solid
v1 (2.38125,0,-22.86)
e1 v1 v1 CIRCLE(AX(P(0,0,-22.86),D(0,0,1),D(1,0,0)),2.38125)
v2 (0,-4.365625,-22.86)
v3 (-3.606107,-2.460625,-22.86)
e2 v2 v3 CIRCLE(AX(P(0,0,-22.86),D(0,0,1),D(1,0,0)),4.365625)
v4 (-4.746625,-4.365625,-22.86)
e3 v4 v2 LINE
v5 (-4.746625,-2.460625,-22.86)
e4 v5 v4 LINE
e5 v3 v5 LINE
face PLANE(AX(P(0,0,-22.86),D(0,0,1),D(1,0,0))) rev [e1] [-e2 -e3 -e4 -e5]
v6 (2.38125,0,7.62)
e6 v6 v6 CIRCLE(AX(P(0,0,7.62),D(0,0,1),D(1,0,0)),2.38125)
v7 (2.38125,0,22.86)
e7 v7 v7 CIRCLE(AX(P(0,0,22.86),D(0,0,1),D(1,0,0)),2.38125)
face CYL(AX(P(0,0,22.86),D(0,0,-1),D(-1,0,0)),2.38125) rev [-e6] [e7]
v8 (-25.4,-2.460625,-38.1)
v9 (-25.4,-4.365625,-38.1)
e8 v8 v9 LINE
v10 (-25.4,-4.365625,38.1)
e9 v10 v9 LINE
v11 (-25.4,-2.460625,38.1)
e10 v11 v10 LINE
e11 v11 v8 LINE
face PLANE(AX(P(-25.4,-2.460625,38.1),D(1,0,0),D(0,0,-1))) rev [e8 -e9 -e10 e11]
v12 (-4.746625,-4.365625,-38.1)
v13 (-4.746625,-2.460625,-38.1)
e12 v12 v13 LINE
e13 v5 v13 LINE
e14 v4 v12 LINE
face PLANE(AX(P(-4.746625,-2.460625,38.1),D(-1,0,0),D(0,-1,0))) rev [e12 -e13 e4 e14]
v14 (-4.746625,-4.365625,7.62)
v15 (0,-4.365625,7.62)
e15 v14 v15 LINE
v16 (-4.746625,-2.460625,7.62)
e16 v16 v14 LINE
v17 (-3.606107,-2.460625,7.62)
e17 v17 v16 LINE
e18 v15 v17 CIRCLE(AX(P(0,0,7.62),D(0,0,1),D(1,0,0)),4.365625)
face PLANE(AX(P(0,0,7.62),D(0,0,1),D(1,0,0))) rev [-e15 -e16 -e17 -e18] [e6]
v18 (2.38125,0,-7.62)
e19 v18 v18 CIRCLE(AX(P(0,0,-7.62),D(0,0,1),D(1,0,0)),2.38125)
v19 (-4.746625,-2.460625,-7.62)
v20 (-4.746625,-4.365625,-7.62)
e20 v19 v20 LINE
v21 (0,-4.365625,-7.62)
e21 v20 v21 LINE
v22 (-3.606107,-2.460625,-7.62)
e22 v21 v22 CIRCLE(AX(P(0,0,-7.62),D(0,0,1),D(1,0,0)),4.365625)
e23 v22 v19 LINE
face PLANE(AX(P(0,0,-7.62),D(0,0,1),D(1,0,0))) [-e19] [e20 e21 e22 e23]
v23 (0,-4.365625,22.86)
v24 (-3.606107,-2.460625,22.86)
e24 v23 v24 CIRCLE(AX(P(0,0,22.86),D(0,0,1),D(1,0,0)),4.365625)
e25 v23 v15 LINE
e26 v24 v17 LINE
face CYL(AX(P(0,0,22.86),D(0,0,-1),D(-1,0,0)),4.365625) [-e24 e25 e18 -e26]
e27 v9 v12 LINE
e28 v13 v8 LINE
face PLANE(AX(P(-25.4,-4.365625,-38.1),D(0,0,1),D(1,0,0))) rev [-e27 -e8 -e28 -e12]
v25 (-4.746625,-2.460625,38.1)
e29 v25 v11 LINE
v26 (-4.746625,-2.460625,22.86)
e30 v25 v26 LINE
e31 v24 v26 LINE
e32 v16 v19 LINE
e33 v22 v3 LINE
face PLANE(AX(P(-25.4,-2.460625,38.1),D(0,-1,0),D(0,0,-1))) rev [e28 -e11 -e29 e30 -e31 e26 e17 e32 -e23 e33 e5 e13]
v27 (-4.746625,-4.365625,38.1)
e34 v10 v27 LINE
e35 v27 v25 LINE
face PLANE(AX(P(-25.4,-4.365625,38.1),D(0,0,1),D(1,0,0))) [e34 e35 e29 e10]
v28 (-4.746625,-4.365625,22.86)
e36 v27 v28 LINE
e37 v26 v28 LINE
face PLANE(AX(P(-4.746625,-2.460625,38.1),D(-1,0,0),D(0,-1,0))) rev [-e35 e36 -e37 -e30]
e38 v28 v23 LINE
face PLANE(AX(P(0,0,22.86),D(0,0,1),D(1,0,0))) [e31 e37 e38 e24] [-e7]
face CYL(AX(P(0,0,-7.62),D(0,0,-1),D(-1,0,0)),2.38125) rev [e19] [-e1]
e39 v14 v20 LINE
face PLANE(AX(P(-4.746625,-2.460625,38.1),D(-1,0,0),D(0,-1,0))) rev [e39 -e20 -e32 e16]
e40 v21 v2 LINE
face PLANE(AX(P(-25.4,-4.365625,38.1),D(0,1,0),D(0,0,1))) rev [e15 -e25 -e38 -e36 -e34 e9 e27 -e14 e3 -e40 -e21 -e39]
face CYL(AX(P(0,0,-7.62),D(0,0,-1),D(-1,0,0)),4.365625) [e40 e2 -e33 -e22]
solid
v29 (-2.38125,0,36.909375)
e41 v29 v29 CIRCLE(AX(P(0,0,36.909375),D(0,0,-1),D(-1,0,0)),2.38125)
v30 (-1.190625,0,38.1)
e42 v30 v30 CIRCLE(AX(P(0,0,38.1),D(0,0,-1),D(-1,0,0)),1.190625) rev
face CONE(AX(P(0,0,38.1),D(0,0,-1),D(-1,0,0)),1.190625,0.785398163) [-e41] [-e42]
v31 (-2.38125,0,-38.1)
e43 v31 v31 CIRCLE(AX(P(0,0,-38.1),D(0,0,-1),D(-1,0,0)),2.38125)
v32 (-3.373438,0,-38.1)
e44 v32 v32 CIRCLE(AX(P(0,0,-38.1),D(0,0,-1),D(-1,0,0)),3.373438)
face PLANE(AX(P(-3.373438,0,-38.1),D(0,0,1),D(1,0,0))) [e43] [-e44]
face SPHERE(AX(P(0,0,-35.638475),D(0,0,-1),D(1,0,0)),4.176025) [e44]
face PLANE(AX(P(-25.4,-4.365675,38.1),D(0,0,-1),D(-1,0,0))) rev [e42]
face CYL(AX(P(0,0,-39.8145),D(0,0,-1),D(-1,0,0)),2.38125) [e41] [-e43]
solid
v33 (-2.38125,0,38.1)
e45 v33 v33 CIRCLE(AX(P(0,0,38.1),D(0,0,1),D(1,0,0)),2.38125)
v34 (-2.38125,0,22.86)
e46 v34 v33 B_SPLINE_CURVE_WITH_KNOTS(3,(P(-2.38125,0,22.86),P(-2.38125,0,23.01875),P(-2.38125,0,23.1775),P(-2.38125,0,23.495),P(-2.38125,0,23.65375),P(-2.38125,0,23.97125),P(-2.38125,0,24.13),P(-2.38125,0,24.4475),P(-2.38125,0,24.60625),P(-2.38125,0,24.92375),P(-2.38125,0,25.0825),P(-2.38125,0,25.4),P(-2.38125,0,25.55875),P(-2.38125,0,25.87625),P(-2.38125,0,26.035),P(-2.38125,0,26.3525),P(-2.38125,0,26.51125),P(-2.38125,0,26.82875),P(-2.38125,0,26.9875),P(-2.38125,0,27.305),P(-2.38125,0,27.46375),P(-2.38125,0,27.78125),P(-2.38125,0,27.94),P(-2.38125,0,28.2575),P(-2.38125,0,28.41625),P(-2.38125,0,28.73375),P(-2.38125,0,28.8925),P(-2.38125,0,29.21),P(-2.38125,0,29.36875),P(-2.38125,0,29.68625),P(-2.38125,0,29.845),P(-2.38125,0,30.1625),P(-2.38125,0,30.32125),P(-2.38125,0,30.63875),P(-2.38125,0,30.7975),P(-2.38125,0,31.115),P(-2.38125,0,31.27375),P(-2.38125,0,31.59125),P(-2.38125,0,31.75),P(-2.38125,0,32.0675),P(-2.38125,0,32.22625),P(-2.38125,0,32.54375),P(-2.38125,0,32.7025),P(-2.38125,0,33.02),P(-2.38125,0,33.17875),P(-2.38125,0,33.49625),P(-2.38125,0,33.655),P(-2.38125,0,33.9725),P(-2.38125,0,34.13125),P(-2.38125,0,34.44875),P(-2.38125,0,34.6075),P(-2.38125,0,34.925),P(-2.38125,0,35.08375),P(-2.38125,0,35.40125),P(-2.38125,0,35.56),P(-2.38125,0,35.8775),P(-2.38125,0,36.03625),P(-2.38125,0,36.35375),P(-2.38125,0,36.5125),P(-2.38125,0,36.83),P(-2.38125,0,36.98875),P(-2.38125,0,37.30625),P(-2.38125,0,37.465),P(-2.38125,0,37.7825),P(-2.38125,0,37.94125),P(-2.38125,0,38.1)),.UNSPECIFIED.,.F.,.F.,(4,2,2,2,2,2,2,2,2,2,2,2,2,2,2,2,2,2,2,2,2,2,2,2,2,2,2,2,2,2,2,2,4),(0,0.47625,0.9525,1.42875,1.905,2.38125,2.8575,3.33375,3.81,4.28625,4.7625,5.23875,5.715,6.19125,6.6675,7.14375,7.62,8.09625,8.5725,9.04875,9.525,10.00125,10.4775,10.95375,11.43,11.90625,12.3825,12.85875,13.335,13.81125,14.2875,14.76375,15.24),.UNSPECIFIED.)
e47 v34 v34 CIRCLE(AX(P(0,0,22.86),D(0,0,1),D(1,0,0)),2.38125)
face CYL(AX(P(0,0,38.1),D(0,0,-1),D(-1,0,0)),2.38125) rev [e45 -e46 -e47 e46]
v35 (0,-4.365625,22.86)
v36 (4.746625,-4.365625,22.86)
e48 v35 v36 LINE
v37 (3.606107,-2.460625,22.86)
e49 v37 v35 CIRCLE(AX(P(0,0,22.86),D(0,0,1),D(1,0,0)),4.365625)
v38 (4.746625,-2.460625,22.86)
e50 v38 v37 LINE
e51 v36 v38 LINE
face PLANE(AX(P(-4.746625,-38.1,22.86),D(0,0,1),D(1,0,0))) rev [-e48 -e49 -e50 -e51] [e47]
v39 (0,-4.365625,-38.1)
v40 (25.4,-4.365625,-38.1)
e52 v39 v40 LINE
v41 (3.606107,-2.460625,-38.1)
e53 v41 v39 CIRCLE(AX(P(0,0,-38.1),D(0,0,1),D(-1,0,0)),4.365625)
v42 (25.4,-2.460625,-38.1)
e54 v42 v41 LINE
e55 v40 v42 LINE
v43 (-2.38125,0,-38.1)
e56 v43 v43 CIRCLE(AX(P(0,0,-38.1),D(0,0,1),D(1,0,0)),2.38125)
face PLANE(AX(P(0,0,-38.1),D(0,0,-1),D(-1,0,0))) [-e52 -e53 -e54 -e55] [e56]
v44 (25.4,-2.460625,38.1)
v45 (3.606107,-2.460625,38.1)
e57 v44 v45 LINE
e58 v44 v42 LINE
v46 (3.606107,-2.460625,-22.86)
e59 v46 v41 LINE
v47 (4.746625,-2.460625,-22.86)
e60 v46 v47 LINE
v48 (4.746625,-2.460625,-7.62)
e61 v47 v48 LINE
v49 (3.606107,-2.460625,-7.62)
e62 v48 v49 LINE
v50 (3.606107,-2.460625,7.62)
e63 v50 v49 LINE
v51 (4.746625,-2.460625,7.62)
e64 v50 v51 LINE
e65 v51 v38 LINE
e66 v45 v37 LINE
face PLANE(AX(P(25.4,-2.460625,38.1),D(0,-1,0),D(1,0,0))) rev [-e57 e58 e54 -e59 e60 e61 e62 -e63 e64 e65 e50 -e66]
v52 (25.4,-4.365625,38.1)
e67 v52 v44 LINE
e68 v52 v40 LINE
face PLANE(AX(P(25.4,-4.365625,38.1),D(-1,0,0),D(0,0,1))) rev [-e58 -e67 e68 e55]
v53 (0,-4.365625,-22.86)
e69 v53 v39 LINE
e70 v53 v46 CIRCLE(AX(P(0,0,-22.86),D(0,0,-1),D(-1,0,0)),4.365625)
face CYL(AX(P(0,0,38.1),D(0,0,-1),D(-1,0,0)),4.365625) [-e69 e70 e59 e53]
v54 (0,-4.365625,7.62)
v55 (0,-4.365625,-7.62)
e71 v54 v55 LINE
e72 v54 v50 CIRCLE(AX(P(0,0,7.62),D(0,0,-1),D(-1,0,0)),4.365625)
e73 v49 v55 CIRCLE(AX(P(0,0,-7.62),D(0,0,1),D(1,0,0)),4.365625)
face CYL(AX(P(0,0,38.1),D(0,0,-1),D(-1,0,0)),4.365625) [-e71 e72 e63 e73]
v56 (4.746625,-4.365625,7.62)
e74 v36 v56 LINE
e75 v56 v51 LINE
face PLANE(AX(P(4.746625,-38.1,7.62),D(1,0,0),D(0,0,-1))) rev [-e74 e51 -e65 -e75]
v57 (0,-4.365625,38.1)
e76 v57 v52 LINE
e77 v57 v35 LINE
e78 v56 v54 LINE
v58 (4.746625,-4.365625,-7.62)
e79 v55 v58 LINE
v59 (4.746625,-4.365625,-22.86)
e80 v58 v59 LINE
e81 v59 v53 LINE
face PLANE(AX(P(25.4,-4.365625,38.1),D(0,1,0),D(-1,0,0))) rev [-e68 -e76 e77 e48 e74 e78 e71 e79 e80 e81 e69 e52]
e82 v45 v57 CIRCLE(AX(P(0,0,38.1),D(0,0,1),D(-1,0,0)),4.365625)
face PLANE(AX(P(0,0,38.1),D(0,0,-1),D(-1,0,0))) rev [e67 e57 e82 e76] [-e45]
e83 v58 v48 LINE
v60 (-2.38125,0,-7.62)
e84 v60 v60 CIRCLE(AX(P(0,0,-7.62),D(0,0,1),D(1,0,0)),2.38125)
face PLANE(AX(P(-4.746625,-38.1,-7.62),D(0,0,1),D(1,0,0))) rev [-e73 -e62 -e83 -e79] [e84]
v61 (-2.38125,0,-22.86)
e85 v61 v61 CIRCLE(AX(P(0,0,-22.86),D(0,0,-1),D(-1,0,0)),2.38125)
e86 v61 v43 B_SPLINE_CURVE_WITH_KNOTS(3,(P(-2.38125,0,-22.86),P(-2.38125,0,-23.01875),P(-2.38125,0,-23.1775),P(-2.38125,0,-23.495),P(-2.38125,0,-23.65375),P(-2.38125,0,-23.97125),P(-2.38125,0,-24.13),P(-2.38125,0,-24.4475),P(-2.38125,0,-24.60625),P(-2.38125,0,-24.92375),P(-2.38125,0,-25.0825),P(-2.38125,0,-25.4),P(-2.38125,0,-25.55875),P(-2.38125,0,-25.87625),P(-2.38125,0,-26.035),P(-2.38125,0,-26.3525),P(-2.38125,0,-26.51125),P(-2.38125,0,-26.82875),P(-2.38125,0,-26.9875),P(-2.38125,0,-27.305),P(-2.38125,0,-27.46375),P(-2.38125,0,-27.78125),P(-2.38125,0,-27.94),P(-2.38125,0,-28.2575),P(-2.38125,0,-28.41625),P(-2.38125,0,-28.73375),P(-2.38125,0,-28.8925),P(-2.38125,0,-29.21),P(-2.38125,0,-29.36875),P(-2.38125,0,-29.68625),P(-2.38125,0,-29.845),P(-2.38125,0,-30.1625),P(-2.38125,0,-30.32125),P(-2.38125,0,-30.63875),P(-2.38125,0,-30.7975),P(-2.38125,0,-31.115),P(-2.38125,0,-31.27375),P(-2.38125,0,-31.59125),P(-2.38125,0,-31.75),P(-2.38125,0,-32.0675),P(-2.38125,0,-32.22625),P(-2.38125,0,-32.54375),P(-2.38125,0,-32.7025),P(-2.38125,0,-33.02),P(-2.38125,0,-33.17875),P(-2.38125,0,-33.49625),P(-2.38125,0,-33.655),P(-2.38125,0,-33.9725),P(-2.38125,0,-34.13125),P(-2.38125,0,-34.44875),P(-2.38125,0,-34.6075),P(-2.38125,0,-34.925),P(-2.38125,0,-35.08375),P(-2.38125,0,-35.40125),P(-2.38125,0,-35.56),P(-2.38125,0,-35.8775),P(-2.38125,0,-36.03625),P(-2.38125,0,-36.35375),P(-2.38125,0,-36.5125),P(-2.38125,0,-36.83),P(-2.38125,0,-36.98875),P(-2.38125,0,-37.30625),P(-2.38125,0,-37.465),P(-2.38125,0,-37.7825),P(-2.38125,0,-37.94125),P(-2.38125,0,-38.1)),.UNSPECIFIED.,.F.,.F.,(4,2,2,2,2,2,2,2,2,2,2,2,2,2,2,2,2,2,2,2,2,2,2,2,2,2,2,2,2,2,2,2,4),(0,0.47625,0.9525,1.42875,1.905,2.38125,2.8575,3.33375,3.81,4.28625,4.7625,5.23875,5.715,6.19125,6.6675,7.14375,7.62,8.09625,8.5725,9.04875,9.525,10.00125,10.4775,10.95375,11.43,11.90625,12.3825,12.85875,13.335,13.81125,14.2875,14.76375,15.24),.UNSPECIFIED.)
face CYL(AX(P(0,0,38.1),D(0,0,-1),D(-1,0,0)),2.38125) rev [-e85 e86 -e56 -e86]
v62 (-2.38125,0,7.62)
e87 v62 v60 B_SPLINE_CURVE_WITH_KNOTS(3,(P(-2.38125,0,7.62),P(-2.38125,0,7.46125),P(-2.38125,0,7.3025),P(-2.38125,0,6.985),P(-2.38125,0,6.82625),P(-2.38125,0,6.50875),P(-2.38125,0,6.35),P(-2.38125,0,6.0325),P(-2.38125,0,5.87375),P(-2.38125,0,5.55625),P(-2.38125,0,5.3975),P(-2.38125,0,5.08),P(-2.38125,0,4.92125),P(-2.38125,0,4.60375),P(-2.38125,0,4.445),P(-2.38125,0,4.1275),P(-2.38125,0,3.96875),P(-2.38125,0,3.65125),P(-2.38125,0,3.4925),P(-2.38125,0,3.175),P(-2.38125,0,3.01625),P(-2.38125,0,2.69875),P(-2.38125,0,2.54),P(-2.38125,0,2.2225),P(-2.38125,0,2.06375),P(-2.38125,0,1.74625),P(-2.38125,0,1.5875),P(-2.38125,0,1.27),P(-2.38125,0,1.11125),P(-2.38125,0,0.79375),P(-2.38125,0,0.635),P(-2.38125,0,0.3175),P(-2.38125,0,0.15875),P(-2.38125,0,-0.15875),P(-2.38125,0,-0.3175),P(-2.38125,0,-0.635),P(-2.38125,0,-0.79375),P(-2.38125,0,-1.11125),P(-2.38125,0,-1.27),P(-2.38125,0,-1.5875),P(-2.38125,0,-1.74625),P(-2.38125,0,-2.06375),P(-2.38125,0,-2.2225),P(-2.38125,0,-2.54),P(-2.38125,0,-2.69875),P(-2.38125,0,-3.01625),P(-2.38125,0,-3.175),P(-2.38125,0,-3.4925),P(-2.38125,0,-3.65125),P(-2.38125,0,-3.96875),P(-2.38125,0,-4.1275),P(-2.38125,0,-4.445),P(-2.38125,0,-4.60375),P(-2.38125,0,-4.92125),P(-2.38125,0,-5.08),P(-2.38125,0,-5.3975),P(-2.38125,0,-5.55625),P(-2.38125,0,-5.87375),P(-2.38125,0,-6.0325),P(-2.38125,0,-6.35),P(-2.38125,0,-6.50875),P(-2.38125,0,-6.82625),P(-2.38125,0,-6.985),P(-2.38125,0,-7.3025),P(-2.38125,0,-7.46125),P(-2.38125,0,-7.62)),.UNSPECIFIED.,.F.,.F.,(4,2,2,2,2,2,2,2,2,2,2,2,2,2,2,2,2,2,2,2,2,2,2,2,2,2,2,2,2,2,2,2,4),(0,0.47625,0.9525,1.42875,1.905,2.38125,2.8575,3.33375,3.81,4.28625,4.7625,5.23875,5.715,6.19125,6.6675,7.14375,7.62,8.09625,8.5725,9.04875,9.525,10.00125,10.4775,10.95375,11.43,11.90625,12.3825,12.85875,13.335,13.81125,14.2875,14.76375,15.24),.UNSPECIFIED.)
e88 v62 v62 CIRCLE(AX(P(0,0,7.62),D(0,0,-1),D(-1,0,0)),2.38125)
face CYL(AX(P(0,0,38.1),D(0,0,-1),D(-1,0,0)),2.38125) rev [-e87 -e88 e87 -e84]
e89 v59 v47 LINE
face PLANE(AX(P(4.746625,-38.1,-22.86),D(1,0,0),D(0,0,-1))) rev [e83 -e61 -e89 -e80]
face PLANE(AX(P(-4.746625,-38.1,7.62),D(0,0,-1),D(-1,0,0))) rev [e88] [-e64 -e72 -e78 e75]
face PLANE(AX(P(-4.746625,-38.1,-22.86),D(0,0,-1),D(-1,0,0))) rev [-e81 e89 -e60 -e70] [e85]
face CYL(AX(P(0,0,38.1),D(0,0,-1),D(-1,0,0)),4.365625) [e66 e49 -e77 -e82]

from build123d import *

# Parameters (mm, degrees)
SKETCH1_R            = 2.38125
EXTRUDE1_DEPTH       = 38.1
SKETCH1_W            = 20.653375
SKETCH1_H            = 1.905
EXTRUDE1_2_DEPTH     = 38.1
SKETCH3_W            = 9.49325
SKETCH3_H            = 15.24
CUT_EXTRUDE1_DEPTH   = 38.1
SKETCH4_R            = 2.38125
EXTRUDE2_DEPTH       = 15.24
SKETCH5_R            = 2.38125
EXTRUDE3_DEPTH       = 15.24
EXTRUDE23_DEPTH      = 48.427977944
EXTRUDE23_DEPTH_BACK = 48.427977944
SKETCH19_W           = 50.8
SKETCH19_H           = 1.7145
CHAMFER1_SIZE        = 1.190625


with BuildPart() as part:
    # Sketch1 → Extrude1 (new, symmetric)
    with BuildSketch(Plane.XY):
        with BuildLine():
            Line((25.4, -4.365625), (0, -4.365625))
            ThreePointArc((0, -4.365625), (-2.039180672, 3.860106712), (3.6061068, -2.460625))
            Line((3.6061068, -2.460625), (25.4, -2.460625))
            Line((25.4, -2.460625), (25.4, -4.365625))
        make_face()
        with Locations(Location((0, 0, 0), (0, 0, 180))):
            Circle(SKETCH1_R, mode=Mode.SUBTRACT)
    extrude(amount=EXTRUDE1_DEPTH, both=True)

    # Sketch3 → Cut-Extrude1 (cut, symmetric)
    with BuildSketch(Plane(origin=(0, 0, 0), x_dir=(1, 0, 0), z_dir=(0, 1, 0))):
        with Locations((0, 15.24)):
            Rectangle(SKETCH3_W, SKETCH3_H)
        with Locations((0, -15.24)):
            Rectangle(SKETCH3_W, SKETCH3_H)
    extrude(amount=CUT_EXTRUDE1_DEPTH, both=True, mode=Mode.SUBTRACT)


with BuildPart() as body_2:
    # Sketch1 → Extrude1 2 (new, symmetric)
    with BuildSketch(Plane.XY):
        with Locations((-15.0733125, -3.413125)):
            Rectangle(SKETCH1_W, SKETCH1_H)
    extrude(amount=EXTRUDE1_2_DEPTH, both=True)

    # Sketch4 → Extrude2 (add)
    with BuildSketch(Plane.XY.offset(-22.86)):
        with BuildLine():
            Line((-4.746625, -2.460625), (-3.6061068, -2.460625))
            ThreePointArc((-3.6061068, -2.460625), (2.039180672, 3.860106712), (0, -4.365625))
            Line((0, -4.365625), (-4.746625, -4.365625))
            Line((-4.746625, -4.365625), (-4.746625, -2.460625))
        make_face()
        with Locations(Location((0, 0, 0), (0, 0, 180))):
            Circle(SKETCH4_R, mode=Mode.SUBTRACT)
    extrude(amount=EXTRUDE2_DEPTH)

    # Sketch5 → Extrude3 (add)
    with BuildSketch(Plane.XY.offset(7.62)):
        with BuildLine():
            Line((-3.6061068, -2.460625), (-4.746625, -2.460625))
            Line((-4.746625, -2.460625), (-4.746625, -4.365625))
            Line((-4.746625, -4.365625), (0, -4.365625))
            ThreePointArc((0, -4.365625), (2.039180672, 3.860106712), (-3.6061068, -2.460625))
        make_face()
        with Locations(Location((0, 0, 0), (0, 0, 180))):
            Circle(SKETCH5_R, mode=Mode.SUBTRACT)
    extrude(amount=EXTRUDE3_DEPTH)


with BuildPart() as body_3:
    # Sketch6 → Revolve1 (revolve)
    with BuildSketch(Plane(origin=(0, 0, 0), x_dir=(1, 0, 0), z_dir=(0, 1, 0)), mode=Mode.PRIVATE) as revolve1_sk:
        with BuildLine():
            Line((-3.3734375, 38.1), (-2.38125, 38.1))
            Line((-2.38125, 38.1), (-2.38125, -38.1))
            Line((-2.38125, -38.1), (-3.3734375, -38.1))
            ThreePointArc((-3.3734375, -38.1), (-1.89206176, -39.361281386), (0, -39.8145))
            Line((0, -39.8145), (0, 39.8145))
            ThreePointArc((0, 39.8145), (-1.89206176, 39.361281386), (-3.3734375, 38.1))
        make_face()
    revolve(revolve1_sk.sketch.rotate(Axis((0, 0, -39.8145), (0, 0, 1)), 180), axis=Axis((0, 0, -39.8145), (0, 0, 1)))

    # Sketch19 → Extrude23 (cut, two sides: drawn at the far end of the back side and taken through both)
    with BuildSketch(Plane(origin=(0, 0, 0), x_dir=(1, 0, 0), z_dir=(0, 1, 0)).offset(-EXTRUDE23_DEPTH_BACK)):
        with Locations((0, -38.95725)):
            Rectangle(SKETCH19_W, SKETCH19_H)
    extrude(amount=EXTRUDE23_DEPTH + EXTRUDE23_DEPTH_BACK, mode=Mode.SUBTRACT)

    # Chamfer1
    chamfer1_edges = [body_3.edges().sort_by_distance(p)[0] for p in [
        (-2.38125, 0, 38.1),
    ]]
    chamfer(chamfer1_edges, length=CHAMFER1_SIZE)


solid = Compound([part.part, body_2.part, body_3.part])
